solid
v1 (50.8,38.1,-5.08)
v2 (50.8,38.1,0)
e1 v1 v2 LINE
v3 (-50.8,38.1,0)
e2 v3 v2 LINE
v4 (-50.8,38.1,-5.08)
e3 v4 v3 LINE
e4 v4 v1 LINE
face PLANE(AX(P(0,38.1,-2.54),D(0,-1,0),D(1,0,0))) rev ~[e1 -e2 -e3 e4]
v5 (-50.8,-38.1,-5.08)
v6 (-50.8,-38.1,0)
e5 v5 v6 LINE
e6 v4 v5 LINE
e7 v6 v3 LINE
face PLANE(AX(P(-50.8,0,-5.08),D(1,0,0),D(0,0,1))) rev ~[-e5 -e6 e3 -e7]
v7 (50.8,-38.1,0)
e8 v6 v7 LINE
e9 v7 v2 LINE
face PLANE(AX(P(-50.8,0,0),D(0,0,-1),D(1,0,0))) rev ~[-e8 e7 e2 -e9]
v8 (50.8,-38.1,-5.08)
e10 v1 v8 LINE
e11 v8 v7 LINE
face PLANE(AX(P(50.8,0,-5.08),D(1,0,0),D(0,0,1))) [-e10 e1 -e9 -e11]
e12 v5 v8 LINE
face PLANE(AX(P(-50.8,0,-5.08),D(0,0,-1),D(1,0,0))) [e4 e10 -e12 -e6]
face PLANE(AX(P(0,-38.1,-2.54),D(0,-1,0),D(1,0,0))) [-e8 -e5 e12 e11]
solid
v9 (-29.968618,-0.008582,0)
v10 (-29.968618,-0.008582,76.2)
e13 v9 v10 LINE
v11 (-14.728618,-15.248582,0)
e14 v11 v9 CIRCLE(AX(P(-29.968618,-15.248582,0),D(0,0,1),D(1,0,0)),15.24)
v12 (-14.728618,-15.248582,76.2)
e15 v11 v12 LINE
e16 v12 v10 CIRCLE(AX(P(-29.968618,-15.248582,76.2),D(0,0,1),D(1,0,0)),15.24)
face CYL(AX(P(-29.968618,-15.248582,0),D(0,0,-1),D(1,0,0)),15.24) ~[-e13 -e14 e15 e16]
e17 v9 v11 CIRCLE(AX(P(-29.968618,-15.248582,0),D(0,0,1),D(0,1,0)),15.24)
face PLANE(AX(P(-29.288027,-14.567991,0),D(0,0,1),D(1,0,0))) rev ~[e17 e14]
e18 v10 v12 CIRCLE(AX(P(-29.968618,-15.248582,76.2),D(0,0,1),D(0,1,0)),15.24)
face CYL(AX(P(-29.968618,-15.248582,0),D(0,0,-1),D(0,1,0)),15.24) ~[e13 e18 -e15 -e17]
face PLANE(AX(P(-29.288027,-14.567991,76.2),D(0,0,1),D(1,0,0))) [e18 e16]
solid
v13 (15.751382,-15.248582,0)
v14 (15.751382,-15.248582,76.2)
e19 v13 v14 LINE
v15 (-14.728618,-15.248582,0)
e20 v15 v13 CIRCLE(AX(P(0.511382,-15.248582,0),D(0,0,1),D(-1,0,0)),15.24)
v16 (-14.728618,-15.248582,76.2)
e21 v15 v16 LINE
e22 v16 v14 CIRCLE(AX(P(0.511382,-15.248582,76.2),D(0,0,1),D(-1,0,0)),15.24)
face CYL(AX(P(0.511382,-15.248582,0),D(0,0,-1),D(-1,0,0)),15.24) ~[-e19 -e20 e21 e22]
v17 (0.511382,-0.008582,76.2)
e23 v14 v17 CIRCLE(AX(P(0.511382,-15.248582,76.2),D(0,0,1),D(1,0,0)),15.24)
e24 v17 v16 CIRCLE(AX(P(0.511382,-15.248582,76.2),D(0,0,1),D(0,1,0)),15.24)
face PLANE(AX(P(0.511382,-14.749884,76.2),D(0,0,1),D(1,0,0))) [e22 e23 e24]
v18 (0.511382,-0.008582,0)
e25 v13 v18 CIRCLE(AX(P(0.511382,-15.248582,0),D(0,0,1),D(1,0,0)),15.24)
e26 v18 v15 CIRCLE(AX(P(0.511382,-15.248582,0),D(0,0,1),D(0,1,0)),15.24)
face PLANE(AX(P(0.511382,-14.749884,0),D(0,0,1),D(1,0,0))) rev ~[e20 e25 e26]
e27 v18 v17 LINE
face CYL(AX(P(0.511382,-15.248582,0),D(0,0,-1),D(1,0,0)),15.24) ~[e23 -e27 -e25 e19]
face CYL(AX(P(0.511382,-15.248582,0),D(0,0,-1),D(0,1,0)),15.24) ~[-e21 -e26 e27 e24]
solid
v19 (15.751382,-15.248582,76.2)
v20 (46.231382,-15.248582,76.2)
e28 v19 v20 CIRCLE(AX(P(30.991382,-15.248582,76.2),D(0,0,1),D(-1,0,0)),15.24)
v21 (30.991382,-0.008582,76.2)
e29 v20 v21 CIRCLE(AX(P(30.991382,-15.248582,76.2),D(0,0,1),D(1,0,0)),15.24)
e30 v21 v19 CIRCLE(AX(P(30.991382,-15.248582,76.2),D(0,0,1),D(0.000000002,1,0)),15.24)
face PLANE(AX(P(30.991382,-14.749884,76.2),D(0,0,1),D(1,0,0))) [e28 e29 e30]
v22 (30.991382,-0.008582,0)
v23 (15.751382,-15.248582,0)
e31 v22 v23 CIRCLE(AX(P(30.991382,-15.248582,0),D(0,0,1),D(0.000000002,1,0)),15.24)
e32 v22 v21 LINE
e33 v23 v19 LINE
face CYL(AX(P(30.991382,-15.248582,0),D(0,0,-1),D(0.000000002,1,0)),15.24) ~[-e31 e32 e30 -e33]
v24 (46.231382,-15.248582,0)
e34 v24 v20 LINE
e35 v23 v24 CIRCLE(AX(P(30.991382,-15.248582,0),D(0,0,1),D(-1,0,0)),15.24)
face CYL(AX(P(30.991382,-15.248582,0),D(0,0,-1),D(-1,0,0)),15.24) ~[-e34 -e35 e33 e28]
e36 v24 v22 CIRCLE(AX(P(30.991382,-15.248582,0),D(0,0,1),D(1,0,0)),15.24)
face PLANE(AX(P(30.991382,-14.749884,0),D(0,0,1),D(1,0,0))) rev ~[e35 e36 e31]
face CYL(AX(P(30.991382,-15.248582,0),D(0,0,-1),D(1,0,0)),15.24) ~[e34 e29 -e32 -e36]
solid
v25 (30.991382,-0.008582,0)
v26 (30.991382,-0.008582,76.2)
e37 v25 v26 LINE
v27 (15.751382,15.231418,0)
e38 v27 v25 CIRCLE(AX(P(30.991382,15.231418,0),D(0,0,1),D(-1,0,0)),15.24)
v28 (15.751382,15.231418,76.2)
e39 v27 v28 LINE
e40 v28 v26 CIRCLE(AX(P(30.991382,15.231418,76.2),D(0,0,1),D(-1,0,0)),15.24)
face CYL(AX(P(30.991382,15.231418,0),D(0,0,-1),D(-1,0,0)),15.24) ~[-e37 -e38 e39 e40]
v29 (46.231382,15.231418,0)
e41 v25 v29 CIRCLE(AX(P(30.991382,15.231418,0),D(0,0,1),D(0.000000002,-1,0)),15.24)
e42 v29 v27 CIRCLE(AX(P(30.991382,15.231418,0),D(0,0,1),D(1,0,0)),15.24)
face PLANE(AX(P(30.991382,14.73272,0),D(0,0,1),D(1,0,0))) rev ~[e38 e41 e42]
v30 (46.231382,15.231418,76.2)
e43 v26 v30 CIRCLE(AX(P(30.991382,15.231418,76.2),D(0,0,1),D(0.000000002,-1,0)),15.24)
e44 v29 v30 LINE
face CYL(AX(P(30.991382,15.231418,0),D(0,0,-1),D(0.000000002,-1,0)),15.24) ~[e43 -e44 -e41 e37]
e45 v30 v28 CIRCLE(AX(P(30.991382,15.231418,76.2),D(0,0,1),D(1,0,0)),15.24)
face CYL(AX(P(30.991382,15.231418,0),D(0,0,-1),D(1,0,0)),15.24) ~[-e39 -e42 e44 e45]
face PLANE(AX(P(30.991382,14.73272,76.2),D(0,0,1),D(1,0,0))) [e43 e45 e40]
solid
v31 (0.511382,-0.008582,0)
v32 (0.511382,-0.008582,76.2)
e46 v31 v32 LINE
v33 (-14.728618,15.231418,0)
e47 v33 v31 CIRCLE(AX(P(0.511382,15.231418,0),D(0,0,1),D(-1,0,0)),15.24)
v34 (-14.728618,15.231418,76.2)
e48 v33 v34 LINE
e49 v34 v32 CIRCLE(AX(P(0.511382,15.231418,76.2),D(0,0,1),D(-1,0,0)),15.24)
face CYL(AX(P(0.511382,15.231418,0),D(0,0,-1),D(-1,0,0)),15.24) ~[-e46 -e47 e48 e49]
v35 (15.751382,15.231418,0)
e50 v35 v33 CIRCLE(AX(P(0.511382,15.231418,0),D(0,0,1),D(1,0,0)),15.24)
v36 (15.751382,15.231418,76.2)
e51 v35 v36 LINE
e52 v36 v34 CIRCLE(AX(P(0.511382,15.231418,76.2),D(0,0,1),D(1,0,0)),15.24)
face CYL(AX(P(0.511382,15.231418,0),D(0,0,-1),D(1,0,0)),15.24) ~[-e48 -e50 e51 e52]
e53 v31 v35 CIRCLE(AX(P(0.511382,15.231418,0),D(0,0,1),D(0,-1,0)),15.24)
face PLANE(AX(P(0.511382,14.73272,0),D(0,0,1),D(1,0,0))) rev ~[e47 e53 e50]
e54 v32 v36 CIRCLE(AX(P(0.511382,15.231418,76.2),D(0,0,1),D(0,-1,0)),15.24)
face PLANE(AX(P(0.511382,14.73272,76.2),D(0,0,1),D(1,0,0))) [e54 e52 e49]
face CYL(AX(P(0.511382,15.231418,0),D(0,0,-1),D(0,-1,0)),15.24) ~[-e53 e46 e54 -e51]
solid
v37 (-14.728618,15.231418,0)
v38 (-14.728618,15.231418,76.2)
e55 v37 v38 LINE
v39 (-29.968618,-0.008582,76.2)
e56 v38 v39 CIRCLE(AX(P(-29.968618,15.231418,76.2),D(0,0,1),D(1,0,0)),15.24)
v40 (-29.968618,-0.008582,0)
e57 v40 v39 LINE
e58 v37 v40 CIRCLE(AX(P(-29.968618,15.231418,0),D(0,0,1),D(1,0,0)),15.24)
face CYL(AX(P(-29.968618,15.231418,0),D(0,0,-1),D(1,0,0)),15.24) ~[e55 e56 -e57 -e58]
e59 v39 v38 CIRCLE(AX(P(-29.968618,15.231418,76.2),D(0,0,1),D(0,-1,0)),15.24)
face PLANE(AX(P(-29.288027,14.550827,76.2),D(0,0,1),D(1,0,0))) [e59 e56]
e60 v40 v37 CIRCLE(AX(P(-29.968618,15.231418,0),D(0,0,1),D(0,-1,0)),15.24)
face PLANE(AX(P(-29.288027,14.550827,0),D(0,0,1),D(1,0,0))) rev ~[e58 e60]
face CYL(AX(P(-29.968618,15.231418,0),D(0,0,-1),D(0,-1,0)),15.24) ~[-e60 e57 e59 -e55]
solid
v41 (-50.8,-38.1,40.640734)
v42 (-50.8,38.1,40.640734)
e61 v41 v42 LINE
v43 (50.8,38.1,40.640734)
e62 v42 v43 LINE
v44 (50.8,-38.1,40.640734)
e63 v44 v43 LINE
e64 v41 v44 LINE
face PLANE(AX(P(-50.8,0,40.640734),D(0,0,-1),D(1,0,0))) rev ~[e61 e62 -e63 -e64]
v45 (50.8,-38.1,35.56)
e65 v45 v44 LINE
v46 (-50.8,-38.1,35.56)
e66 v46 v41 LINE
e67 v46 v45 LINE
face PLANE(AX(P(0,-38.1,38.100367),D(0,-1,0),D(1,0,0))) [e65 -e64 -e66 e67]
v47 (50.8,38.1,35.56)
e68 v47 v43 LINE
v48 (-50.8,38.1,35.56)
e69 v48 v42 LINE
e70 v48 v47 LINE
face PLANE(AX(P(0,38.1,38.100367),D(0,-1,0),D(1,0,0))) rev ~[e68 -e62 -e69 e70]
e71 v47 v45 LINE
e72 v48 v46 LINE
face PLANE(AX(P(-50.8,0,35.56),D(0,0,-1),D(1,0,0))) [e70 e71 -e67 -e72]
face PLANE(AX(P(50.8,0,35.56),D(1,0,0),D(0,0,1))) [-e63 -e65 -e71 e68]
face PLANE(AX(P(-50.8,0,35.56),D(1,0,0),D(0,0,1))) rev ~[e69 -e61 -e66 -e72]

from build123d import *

# Parameters (mm, degrees)
F1_DEPTH = 76.2
F2_W     = 101.6
F2_H     = 5.08
F3_DEPTH = 38.1
F2_H_2   = 5.0807343126


# Not quite as in the source:
# - a feature names something its author has since deleted; it is built from what else it names


with BuildPart() as f1:
    # F0 (on Top) → F1 (new body)
    with BuildSketch(Plane.XY):
        with BuildLine():
            ThreePointArc((-29.9686177893, -0.0085821988), (-40.7449251346, -26.0248895441), (-14.7286177893, -15.2485821988))
            ThreePointArc((-14.7286177893, -15.2485821988), (-19.192310444, -4.4722748535), (-29.9686177893, -0.0085821988))
        make_face()
    extrude(amount=F1_DEPTH)


with BuildPart() as f1b:
    # F0 (on Top) → F1, piece 2 (new body)
    with BuildSketch(Plane.XY):
        with BuildLine():
            ThreePointArc((0.5113822094, -0.0085821988), (-10.264925135, -4.472274854), (-14.7286177893, -15.2485821988))
            ThreePointArc((-14.7286177893, -15.2485821988), (0.5113822107, -30.4885821988), (15.7513822107, -15.2485821988))
            ThreePointArc((15.7513822107, -15.2485821988), (11.2876895555, -4.4722748531), (0.5113822094, -0.0085821988))
        make_face()
    extrude(amount=F1_DEPTH)


with BuildPart() as f1c:
    # F0 (on Top) → F1, piece 3 (new body)
    with BuildSketch(Plane.XY):
        with BuildLine():
            ThreePointArc((-14.7286177893, 15.2314178012), (-40.7449251346, 26.0077251465), (-29.9686177893, -0.0085821988))
            ThreePointArc((-29.9686177893, -0.0085821988), (-19.192310444, 4.4551104559), (-14.7286177893, 15.2314178012))
        make_face()
    extrude(amount=F1_DEPTH)


with BuildPart() as f1d:
    # F0 (on Top) → F1, piece 4 (new body)
    with BuildSketch(Plane.XY):
        with BuildLine():
            ThreePointArc((30.9913822354, -0.0085821988), (20.2150748742, -4.4722748448), (15.7513822107, -15.2485821988))
            ThreePointArc((15.7513822107, -15.2485821988), (30.9913822107, -30.4885821988), (46.2313822107, -15.2485821988))
            ThreePointArc((46.2313822107, -15.2485821988), (41.7676895647, -4.4722748623), (30.9913822354, -0.0085821988))
        make_face()
    extrude(amount=F1_DEPTH)


with BuildPart() as f1e:
    # F0 (on Top) → F1, piece 5 (new body)
    with BuildSketch(Plane.XY):
        with BuildLine():
            ThreePointArc((-14.7286177893, 15.2314178012), (-10.264925135, 4.4551104564), (0.5113822094, -0.0085821988))
            ThreePointArc((0.5113822094, -0.0085821988), (11.2876895555, 4.4551104555), (15.7513822107, 15.2314178012))
            ThreePointArc((15.7513822107, 15.2314178012), (0.5113822107, 30.4714178012), (-14.7286177893, 15.2314178012))
        make_face()
    extrude(amount=F1_DEPTH)


with BuildPart() as f1f:
    # F0 (on Top) → F1, piece 6 (new body)
    with BuildSketch(Plane.XY):
        with BuildLine():
            ThreePointArc((15.7513822107, 15.2314178012), (20.2150748742, 4.4551104472), (30.9913822354, -0.0085821988))
            ThreePointArc((30.9913822354, -0.0085821988), (41.7676895647, 4.4551104647), (46.2313822107, 15.2314178012))
            ThreePointArc((46.2313822107, 15.2314178012), (30.9913822107, 30.4714178012), (15.7513822107, 15.2314178012))
        make_face()
    extrude(amount=F1_DEPTH)


with BuildPart() as f3:
    # F2 (on Front) → F3 (new body, symmetric)
    with BuildSketch(Plane.XZ):
        with Locations((0, -2.54)):
            Rectangle(F2_W, F2_H)
    extrude(amount=F3_DEPTH, both=True)


with BuildPart() as f3b:
    # F2 (on Front) → F3, piece 2 (new body, symmetric)
    with BuildSketch(Plane.XZ):
        with Locations((0, 38.1003671563)):
            Rectangle(F2_W, F2_H_2)
    extrude(amount=F3_DEPTH, both=True)


solid = Compound([f1.part, f1b.part, f1c.part, f1d.part, f1e.part, f1f.part, f3.part, f3b.part])
